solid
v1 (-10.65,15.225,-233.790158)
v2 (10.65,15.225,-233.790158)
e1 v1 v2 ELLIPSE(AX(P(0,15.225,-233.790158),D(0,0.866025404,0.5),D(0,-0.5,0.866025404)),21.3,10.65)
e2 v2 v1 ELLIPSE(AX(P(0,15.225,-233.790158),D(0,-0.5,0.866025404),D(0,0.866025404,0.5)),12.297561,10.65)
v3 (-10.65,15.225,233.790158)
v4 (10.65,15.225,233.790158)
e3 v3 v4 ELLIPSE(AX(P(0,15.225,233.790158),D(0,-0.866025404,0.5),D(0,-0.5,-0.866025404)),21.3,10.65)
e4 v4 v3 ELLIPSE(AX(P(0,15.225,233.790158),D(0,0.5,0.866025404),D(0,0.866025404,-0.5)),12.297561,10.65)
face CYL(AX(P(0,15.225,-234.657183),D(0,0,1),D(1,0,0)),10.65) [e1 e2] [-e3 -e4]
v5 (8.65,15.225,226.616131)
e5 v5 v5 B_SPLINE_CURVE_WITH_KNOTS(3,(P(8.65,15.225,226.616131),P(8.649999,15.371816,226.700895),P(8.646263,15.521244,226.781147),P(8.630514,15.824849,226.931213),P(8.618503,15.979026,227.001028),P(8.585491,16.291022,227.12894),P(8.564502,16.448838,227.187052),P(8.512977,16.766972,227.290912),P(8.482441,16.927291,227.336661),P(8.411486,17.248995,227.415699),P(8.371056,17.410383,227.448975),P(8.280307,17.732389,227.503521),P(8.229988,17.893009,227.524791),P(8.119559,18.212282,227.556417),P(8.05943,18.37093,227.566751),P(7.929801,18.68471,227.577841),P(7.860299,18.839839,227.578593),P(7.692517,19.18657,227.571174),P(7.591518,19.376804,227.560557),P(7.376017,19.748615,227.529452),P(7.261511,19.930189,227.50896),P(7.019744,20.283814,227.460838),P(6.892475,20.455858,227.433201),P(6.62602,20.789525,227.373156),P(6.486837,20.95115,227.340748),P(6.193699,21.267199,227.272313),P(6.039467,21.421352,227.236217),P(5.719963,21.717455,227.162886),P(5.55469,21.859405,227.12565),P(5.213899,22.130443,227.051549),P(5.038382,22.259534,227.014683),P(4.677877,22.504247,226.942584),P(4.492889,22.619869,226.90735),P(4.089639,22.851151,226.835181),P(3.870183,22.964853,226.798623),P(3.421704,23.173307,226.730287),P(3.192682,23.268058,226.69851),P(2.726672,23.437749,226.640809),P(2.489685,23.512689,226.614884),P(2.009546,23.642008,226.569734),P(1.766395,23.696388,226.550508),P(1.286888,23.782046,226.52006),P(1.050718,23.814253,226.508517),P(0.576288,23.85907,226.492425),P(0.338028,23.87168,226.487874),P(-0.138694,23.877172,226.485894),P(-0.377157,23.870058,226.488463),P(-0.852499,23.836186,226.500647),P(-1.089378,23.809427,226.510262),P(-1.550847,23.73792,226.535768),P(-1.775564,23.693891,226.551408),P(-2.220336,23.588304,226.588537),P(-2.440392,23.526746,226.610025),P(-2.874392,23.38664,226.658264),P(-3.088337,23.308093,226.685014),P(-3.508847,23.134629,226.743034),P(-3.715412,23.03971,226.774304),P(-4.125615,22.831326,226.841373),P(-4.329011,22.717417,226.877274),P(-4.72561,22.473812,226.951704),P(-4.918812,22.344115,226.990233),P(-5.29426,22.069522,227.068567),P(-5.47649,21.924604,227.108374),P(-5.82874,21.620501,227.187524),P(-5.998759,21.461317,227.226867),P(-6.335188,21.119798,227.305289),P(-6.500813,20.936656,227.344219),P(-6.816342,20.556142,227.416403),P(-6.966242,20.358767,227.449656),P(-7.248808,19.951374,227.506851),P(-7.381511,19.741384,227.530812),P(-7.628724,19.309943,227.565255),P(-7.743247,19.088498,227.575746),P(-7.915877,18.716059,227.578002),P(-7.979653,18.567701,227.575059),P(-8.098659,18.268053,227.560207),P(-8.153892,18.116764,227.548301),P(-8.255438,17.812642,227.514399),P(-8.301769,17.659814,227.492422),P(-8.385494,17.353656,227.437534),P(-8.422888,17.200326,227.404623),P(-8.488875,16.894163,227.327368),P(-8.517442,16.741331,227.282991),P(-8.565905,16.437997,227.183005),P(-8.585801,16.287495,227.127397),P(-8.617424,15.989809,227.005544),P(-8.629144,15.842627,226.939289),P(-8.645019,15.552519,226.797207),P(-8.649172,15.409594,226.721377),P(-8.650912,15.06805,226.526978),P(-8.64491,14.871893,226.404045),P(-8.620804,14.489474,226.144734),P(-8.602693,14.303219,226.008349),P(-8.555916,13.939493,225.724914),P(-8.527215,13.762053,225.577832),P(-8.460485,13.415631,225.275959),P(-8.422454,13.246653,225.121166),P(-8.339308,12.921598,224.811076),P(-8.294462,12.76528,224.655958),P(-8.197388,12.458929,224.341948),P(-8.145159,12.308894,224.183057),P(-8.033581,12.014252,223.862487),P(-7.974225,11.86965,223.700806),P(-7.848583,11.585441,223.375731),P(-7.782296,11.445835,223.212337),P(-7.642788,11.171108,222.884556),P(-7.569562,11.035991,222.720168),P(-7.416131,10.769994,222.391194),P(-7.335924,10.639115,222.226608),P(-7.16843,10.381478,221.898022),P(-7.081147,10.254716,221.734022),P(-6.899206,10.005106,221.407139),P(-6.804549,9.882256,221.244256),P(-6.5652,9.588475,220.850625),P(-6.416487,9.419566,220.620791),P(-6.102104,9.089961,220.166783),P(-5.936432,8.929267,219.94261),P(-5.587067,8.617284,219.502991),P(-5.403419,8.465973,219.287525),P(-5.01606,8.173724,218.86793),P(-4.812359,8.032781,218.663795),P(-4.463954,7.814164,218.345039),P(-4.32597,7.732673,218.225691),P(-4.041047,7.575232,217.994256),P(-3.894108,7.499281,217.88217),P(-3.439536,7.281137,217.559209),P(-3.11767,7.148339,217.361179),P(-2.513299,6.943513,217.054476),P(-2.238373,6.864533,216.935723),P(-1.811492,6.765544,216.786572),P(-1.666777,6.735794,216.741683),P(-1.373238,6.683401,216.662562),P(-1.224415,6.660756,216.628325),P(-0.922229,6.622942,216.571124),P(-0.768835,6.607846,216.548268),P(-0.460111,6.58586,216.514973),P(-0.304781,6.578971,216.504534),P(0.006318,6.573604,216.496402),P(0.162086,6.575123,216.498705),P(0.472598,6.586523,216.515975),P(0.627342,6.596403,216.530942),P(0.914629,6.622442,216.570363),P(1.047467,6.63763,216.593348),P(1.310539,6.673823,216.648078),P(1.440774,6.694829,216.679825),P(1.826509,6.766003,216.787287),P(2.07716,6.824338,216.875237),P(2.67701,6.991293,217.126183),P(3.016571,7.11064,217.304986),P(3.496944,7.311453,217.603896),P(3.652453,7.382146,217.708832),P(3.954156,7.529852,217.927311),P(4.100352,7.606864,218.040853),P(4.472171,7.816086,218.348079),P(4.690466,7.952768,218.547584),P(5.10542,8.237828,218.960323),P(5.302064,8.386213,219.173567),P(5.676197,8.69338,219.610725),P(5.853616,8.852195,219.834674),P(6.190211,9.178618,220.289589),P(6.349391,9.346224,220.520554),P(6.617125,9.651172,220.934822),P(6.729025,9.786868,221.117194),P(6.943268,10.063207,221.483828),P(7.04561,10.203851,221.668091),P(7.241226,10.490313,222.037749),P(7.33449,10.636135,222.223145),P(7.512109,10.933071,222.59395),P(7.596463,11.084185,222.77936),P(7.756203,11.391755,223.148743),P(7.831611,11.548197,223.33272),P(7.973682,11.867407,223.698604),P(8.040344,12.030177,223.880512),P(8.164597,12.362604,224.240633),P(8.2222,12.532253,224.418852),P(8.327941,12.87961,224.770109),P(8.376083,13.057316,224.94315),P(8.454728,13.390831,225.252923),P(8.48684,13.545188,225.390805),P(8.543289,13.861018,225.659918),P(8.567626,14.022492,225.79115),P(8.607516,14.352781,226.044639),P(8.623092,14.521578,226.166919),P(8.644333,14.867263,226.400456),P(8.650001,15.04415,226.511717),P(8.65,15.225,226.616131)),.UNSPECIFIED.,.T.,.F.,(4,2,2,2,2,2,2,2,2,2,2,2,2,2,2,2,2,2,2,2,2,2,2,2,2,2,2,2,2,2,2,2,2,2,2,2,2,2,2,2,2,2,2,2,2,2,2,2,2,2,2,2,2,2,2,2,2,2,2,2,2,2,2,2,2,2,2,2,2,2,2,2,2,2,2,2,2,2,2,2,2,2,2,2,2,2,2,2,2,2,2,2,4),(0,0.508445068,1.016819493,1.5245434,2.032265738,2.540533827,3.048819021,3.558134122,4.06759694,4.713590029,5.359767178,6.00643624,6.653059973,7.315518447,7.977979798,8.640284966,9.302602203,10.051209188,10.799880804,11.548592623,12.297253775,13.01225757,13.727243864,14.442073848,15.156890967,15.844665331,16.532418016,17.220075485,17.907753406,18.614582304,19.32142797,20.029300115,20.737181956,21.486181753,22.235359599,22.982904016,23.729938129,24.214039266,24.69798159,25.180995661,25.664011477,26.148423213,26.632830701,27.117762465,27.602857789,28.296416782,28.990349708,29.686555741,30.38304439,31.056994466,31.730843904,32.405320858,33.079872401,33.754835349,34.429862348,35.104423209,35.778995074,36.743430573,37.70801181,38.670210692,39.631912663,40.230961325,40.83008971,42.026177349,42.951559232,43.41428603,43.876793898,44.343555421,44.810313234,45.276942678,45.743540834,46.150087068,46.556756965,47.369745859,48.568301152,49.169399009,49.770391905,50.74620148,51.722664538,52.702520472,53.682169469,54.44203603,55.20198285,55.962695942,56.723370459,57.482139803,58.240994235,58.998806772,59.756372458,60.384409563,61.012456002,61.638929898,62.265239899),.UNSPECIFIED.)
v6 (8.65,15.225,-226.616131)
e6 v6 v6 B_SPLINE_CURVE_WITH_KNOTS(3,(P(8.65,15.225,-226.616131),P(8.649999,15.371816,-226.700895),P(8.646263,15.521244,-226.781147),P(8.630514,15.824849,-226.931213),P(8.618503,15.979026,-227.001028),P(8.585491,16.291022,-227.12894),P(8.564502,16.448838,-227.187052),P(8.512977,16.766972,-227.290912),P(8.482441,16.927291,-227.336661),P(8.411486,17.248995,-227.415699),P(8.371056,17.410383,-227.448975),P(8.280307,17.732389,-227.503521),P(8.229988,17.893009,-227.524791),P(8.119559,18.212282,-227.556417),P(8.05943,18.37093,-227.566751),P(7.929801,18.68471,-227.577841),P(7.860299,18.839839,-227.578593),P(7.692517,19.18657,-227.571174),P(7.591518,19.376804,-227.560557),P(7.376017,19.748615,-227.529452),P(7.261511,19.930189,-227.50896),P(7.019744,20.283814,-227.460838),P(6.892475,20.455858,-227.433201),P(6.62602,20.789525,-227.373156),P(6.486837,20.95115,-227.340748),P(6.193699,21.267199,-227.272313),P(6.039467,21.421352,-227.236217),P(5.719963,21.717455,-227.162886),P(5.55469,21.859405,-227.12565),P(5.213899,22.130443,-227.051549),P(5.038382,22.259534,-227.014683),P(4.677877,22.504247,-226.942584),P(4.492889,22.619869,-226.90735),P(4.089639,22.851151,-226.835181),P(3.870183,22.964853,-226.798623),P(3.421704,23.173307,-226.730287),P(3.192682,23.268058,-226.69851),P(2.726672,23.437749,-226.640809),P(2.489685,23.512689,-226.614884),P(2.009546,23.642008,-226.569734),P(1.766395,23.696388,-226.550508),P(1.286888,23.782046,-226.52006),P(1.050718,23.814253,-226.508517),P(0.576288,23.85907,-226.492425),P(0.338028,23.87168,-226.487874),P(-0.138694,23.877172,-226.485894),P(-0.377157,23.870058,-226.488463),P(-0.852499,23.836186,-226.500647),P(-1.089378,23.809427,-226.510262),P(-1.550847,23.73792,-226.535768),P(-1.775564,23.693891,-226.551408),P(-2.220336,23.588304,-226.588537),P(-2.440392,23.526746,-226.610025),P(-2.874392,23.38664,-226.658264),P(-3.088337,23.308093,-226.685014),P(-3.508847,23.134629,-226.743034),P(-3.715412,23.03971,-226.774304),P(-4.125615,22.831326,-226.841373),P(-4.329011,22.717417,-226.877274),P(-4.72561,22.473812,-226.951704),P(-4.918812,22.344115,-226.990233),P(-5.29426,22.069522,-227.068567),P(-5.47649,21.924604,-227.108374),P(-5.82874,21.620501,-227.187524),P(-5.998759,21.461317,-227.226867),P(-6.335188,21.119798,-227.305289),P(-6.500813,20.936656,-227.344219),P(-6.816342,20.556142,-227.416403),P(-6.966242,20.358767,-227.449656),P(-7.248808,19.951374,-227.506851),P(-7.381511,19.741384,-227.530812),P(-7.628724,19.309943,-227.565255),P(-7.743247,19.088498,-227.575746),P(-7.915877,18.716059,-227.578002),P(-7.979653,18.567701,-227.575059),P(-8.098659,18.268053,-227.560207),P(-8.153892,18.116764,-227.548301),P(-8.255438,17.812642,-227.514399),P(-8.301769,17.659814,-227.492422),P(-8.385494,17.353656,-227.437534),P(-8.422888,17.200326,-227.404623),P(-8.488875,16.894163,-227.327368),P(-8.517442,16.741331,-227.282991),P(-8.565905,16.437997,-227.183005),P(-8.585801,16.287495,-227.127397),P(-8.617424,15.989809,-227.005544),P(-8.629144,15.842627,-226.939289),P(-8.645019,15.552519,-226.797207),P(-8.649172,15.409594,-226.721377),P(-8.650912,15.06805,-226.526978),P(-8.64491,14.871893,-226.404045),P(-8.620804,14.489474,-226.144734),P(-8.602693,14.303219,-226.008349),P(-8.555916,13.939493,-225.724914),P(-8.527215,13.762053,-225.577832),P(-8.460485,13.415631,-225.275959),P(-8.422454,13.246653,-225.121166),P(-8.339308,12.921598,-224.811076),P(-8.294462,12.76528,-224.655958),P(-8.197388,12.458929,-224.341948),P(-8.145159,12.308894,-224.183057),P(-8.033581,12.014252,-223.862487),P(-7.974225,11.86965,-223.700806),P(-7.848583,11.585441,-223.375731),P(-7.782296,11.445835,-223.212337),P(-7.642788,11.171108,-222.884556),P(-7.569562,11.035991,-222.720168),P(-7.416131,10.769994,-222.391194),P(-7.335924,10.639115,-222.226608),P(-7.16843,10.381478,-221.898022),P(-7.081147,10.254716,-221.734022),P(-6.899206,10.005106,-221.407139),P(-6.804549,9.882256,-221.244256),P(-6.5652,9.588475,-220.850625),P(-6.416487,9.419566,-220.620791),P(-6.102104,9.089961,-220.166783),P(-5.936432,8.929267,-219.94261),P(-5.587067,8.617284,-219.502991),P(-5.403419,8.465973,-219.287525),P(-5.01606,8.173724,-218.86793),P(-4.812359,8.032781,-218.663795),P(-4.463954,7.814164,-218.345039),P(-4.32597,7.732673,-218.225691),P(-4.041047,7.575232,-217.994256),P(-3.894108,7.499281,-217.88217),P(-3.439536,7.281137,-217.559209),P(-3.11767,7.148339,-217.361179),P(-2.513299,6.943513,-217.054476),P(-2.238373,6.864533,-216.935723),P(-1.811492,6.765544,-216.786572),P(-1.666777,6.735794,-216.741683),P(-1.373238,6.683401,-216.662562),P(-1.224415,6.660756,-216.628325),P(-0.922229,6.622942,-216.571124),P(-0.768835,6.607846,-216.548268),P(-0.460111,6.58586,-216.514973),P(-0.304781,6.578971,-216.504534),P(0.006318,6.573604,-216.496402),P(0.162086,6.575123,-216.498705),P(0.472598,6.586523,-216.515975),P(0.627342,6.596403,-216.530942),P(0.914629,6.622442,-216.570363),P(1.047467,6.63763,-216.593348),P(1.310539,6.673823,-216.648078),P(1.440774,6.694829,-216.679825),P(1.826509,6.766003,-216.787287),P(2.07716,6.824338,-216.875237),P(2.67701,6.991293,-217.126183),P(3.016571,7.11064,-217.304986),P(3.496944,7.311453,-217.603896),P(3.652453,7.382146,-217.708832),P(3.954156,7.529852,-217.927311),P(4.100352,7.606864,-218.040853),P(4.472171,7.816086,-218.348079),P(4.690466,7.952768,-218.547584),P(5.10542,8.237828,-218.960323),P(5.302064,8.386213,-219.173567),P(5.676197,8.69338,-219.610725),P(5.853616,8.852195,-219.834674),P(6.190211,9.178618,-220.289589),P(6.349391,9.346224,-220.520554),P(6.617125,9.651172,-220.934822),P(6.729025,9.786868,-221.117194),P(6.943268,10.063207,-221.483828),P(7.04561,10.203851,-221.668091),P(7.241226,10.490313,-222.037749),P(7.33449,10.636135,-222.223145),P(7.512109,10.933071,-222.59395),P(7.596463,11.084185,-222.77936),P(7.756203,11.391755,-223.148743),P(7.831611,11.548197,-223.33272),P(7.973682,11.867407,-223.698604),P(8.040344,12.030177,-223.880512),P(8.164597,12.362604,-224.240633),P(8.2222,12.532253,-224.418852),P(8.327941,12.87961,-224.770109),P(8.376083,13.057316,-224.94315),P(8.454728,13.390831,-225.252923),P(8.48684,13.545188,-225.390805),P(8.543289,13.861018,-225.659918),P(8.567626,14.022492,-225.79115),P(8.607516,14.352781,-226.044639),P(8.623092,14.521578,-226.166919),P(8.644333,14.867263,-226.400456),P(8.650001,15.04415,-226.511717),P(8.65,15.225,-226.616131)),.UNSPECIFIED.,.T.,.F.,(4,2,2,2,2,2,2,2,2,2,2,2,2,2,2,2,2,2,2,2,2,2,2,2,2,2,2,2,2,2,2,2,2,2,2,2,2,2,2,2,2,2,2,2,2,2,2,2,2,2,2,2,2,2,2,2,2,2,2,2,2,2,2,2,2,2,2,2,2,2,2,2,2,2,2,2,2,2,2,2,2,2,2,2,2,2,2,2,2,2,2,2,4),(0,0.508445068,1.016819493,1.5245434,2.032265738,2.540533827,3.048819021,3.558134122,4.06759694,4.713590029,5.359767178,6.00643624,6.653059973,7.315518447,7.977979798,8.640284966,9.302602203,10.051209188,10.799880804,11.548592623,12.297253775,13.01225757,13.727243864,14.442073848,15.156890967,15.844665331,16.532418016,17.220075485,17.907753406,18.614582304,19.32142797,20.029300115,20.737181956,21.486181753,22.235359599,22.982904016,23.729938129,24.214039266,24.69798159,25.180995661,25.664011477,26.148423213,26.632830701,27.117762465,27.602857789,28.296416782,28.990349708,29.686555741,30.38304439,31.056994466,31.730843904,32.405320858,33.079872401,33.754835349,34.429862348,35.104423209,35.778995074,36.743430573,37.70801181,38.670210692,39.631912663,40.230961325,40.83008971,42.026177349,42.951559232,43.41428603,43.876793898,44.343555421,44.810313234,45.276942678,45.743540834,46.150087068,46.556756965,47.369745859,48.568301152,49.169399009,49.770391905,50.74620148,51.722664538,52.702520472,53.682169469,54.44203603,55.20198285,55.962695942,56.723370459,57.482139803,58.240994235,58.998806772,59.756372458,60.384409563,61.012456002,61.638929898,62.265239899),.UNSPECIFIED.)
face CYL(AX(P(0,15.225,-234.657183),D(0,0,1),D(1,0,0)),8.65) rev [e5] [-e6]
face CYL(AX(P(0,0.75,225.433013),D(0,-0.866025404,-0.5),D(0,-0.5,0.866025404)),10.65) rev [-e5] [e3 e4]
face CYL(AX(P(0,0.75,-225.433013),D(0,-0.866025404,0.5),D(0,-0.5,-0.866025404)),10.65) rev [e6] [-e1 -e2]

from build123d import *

# Parameters (mm, degrees)
EXTRUDE_START         = -233.790157948
EXTRUDE_1_OUTLINE_R   = 10.65
EXTRUDE_1_OUTLINE_R_2 = 8.65
EXTRUDE_1_DEPTH       = 233.790157948
EXTRUDE_START_2       = 111
EXTRUDE_1_2_DEPTH     = 29


with BuildPart() as part:
    # Бобышка-Вытянуть1: read off the stored shape, not the designer's step
    # Бобышка-Вытянуть1 outline → Бобышка-Вытянуть1 (new body)
    with BuildSketch(Plane.XY.offset(EXTRUDE_START)):
        with Locations((0, 15.225)):
            Circle(EXTRUDE_1_OUTLINE_R)
        with Locations((0, 15.225)):
            Circle(EXTRUDE_1_OUTLINE_R_2, mode=Mode.SUBTRACT)
    extrude(amount=EXTRUDE_1_DEPTH)

    # Extrude 1 2 outline → Extrude 1 2 (cut)
    with BuildSketch(Plane(origin=(0, 0, 0), x_dir=(1, 0, 0), z_dir=(0, 0.8660254037845095, -0.4999999999998773)).offset(EXTRUDE_START_2)):
        with BuildLine():
            ThreePointArc((-10.65, 194.855715851), (0, 184.205715851), (10.65, 194.855715851))
            Line((10.65, 194.855715851), (10.65, 202))
            Line((10.65, 202), (-10.65, 202))
            Line((-10.65, 202), (-10.65, 194.855715851))
        make_face()
    extrude(amount=EXTRUDE_1_2_DEPTH, mode=Mode.SUBTRACT)

    # Зеркальное отражение1: part across plane


with BuildPart() as part_1:
    add(part.part)
    add(part.part.mirror(Plane(origin=(0, 15.225, 0), x_dir=(1, 0, 0), z_dir=(0, 0, 1))))


solid = part_1.part
